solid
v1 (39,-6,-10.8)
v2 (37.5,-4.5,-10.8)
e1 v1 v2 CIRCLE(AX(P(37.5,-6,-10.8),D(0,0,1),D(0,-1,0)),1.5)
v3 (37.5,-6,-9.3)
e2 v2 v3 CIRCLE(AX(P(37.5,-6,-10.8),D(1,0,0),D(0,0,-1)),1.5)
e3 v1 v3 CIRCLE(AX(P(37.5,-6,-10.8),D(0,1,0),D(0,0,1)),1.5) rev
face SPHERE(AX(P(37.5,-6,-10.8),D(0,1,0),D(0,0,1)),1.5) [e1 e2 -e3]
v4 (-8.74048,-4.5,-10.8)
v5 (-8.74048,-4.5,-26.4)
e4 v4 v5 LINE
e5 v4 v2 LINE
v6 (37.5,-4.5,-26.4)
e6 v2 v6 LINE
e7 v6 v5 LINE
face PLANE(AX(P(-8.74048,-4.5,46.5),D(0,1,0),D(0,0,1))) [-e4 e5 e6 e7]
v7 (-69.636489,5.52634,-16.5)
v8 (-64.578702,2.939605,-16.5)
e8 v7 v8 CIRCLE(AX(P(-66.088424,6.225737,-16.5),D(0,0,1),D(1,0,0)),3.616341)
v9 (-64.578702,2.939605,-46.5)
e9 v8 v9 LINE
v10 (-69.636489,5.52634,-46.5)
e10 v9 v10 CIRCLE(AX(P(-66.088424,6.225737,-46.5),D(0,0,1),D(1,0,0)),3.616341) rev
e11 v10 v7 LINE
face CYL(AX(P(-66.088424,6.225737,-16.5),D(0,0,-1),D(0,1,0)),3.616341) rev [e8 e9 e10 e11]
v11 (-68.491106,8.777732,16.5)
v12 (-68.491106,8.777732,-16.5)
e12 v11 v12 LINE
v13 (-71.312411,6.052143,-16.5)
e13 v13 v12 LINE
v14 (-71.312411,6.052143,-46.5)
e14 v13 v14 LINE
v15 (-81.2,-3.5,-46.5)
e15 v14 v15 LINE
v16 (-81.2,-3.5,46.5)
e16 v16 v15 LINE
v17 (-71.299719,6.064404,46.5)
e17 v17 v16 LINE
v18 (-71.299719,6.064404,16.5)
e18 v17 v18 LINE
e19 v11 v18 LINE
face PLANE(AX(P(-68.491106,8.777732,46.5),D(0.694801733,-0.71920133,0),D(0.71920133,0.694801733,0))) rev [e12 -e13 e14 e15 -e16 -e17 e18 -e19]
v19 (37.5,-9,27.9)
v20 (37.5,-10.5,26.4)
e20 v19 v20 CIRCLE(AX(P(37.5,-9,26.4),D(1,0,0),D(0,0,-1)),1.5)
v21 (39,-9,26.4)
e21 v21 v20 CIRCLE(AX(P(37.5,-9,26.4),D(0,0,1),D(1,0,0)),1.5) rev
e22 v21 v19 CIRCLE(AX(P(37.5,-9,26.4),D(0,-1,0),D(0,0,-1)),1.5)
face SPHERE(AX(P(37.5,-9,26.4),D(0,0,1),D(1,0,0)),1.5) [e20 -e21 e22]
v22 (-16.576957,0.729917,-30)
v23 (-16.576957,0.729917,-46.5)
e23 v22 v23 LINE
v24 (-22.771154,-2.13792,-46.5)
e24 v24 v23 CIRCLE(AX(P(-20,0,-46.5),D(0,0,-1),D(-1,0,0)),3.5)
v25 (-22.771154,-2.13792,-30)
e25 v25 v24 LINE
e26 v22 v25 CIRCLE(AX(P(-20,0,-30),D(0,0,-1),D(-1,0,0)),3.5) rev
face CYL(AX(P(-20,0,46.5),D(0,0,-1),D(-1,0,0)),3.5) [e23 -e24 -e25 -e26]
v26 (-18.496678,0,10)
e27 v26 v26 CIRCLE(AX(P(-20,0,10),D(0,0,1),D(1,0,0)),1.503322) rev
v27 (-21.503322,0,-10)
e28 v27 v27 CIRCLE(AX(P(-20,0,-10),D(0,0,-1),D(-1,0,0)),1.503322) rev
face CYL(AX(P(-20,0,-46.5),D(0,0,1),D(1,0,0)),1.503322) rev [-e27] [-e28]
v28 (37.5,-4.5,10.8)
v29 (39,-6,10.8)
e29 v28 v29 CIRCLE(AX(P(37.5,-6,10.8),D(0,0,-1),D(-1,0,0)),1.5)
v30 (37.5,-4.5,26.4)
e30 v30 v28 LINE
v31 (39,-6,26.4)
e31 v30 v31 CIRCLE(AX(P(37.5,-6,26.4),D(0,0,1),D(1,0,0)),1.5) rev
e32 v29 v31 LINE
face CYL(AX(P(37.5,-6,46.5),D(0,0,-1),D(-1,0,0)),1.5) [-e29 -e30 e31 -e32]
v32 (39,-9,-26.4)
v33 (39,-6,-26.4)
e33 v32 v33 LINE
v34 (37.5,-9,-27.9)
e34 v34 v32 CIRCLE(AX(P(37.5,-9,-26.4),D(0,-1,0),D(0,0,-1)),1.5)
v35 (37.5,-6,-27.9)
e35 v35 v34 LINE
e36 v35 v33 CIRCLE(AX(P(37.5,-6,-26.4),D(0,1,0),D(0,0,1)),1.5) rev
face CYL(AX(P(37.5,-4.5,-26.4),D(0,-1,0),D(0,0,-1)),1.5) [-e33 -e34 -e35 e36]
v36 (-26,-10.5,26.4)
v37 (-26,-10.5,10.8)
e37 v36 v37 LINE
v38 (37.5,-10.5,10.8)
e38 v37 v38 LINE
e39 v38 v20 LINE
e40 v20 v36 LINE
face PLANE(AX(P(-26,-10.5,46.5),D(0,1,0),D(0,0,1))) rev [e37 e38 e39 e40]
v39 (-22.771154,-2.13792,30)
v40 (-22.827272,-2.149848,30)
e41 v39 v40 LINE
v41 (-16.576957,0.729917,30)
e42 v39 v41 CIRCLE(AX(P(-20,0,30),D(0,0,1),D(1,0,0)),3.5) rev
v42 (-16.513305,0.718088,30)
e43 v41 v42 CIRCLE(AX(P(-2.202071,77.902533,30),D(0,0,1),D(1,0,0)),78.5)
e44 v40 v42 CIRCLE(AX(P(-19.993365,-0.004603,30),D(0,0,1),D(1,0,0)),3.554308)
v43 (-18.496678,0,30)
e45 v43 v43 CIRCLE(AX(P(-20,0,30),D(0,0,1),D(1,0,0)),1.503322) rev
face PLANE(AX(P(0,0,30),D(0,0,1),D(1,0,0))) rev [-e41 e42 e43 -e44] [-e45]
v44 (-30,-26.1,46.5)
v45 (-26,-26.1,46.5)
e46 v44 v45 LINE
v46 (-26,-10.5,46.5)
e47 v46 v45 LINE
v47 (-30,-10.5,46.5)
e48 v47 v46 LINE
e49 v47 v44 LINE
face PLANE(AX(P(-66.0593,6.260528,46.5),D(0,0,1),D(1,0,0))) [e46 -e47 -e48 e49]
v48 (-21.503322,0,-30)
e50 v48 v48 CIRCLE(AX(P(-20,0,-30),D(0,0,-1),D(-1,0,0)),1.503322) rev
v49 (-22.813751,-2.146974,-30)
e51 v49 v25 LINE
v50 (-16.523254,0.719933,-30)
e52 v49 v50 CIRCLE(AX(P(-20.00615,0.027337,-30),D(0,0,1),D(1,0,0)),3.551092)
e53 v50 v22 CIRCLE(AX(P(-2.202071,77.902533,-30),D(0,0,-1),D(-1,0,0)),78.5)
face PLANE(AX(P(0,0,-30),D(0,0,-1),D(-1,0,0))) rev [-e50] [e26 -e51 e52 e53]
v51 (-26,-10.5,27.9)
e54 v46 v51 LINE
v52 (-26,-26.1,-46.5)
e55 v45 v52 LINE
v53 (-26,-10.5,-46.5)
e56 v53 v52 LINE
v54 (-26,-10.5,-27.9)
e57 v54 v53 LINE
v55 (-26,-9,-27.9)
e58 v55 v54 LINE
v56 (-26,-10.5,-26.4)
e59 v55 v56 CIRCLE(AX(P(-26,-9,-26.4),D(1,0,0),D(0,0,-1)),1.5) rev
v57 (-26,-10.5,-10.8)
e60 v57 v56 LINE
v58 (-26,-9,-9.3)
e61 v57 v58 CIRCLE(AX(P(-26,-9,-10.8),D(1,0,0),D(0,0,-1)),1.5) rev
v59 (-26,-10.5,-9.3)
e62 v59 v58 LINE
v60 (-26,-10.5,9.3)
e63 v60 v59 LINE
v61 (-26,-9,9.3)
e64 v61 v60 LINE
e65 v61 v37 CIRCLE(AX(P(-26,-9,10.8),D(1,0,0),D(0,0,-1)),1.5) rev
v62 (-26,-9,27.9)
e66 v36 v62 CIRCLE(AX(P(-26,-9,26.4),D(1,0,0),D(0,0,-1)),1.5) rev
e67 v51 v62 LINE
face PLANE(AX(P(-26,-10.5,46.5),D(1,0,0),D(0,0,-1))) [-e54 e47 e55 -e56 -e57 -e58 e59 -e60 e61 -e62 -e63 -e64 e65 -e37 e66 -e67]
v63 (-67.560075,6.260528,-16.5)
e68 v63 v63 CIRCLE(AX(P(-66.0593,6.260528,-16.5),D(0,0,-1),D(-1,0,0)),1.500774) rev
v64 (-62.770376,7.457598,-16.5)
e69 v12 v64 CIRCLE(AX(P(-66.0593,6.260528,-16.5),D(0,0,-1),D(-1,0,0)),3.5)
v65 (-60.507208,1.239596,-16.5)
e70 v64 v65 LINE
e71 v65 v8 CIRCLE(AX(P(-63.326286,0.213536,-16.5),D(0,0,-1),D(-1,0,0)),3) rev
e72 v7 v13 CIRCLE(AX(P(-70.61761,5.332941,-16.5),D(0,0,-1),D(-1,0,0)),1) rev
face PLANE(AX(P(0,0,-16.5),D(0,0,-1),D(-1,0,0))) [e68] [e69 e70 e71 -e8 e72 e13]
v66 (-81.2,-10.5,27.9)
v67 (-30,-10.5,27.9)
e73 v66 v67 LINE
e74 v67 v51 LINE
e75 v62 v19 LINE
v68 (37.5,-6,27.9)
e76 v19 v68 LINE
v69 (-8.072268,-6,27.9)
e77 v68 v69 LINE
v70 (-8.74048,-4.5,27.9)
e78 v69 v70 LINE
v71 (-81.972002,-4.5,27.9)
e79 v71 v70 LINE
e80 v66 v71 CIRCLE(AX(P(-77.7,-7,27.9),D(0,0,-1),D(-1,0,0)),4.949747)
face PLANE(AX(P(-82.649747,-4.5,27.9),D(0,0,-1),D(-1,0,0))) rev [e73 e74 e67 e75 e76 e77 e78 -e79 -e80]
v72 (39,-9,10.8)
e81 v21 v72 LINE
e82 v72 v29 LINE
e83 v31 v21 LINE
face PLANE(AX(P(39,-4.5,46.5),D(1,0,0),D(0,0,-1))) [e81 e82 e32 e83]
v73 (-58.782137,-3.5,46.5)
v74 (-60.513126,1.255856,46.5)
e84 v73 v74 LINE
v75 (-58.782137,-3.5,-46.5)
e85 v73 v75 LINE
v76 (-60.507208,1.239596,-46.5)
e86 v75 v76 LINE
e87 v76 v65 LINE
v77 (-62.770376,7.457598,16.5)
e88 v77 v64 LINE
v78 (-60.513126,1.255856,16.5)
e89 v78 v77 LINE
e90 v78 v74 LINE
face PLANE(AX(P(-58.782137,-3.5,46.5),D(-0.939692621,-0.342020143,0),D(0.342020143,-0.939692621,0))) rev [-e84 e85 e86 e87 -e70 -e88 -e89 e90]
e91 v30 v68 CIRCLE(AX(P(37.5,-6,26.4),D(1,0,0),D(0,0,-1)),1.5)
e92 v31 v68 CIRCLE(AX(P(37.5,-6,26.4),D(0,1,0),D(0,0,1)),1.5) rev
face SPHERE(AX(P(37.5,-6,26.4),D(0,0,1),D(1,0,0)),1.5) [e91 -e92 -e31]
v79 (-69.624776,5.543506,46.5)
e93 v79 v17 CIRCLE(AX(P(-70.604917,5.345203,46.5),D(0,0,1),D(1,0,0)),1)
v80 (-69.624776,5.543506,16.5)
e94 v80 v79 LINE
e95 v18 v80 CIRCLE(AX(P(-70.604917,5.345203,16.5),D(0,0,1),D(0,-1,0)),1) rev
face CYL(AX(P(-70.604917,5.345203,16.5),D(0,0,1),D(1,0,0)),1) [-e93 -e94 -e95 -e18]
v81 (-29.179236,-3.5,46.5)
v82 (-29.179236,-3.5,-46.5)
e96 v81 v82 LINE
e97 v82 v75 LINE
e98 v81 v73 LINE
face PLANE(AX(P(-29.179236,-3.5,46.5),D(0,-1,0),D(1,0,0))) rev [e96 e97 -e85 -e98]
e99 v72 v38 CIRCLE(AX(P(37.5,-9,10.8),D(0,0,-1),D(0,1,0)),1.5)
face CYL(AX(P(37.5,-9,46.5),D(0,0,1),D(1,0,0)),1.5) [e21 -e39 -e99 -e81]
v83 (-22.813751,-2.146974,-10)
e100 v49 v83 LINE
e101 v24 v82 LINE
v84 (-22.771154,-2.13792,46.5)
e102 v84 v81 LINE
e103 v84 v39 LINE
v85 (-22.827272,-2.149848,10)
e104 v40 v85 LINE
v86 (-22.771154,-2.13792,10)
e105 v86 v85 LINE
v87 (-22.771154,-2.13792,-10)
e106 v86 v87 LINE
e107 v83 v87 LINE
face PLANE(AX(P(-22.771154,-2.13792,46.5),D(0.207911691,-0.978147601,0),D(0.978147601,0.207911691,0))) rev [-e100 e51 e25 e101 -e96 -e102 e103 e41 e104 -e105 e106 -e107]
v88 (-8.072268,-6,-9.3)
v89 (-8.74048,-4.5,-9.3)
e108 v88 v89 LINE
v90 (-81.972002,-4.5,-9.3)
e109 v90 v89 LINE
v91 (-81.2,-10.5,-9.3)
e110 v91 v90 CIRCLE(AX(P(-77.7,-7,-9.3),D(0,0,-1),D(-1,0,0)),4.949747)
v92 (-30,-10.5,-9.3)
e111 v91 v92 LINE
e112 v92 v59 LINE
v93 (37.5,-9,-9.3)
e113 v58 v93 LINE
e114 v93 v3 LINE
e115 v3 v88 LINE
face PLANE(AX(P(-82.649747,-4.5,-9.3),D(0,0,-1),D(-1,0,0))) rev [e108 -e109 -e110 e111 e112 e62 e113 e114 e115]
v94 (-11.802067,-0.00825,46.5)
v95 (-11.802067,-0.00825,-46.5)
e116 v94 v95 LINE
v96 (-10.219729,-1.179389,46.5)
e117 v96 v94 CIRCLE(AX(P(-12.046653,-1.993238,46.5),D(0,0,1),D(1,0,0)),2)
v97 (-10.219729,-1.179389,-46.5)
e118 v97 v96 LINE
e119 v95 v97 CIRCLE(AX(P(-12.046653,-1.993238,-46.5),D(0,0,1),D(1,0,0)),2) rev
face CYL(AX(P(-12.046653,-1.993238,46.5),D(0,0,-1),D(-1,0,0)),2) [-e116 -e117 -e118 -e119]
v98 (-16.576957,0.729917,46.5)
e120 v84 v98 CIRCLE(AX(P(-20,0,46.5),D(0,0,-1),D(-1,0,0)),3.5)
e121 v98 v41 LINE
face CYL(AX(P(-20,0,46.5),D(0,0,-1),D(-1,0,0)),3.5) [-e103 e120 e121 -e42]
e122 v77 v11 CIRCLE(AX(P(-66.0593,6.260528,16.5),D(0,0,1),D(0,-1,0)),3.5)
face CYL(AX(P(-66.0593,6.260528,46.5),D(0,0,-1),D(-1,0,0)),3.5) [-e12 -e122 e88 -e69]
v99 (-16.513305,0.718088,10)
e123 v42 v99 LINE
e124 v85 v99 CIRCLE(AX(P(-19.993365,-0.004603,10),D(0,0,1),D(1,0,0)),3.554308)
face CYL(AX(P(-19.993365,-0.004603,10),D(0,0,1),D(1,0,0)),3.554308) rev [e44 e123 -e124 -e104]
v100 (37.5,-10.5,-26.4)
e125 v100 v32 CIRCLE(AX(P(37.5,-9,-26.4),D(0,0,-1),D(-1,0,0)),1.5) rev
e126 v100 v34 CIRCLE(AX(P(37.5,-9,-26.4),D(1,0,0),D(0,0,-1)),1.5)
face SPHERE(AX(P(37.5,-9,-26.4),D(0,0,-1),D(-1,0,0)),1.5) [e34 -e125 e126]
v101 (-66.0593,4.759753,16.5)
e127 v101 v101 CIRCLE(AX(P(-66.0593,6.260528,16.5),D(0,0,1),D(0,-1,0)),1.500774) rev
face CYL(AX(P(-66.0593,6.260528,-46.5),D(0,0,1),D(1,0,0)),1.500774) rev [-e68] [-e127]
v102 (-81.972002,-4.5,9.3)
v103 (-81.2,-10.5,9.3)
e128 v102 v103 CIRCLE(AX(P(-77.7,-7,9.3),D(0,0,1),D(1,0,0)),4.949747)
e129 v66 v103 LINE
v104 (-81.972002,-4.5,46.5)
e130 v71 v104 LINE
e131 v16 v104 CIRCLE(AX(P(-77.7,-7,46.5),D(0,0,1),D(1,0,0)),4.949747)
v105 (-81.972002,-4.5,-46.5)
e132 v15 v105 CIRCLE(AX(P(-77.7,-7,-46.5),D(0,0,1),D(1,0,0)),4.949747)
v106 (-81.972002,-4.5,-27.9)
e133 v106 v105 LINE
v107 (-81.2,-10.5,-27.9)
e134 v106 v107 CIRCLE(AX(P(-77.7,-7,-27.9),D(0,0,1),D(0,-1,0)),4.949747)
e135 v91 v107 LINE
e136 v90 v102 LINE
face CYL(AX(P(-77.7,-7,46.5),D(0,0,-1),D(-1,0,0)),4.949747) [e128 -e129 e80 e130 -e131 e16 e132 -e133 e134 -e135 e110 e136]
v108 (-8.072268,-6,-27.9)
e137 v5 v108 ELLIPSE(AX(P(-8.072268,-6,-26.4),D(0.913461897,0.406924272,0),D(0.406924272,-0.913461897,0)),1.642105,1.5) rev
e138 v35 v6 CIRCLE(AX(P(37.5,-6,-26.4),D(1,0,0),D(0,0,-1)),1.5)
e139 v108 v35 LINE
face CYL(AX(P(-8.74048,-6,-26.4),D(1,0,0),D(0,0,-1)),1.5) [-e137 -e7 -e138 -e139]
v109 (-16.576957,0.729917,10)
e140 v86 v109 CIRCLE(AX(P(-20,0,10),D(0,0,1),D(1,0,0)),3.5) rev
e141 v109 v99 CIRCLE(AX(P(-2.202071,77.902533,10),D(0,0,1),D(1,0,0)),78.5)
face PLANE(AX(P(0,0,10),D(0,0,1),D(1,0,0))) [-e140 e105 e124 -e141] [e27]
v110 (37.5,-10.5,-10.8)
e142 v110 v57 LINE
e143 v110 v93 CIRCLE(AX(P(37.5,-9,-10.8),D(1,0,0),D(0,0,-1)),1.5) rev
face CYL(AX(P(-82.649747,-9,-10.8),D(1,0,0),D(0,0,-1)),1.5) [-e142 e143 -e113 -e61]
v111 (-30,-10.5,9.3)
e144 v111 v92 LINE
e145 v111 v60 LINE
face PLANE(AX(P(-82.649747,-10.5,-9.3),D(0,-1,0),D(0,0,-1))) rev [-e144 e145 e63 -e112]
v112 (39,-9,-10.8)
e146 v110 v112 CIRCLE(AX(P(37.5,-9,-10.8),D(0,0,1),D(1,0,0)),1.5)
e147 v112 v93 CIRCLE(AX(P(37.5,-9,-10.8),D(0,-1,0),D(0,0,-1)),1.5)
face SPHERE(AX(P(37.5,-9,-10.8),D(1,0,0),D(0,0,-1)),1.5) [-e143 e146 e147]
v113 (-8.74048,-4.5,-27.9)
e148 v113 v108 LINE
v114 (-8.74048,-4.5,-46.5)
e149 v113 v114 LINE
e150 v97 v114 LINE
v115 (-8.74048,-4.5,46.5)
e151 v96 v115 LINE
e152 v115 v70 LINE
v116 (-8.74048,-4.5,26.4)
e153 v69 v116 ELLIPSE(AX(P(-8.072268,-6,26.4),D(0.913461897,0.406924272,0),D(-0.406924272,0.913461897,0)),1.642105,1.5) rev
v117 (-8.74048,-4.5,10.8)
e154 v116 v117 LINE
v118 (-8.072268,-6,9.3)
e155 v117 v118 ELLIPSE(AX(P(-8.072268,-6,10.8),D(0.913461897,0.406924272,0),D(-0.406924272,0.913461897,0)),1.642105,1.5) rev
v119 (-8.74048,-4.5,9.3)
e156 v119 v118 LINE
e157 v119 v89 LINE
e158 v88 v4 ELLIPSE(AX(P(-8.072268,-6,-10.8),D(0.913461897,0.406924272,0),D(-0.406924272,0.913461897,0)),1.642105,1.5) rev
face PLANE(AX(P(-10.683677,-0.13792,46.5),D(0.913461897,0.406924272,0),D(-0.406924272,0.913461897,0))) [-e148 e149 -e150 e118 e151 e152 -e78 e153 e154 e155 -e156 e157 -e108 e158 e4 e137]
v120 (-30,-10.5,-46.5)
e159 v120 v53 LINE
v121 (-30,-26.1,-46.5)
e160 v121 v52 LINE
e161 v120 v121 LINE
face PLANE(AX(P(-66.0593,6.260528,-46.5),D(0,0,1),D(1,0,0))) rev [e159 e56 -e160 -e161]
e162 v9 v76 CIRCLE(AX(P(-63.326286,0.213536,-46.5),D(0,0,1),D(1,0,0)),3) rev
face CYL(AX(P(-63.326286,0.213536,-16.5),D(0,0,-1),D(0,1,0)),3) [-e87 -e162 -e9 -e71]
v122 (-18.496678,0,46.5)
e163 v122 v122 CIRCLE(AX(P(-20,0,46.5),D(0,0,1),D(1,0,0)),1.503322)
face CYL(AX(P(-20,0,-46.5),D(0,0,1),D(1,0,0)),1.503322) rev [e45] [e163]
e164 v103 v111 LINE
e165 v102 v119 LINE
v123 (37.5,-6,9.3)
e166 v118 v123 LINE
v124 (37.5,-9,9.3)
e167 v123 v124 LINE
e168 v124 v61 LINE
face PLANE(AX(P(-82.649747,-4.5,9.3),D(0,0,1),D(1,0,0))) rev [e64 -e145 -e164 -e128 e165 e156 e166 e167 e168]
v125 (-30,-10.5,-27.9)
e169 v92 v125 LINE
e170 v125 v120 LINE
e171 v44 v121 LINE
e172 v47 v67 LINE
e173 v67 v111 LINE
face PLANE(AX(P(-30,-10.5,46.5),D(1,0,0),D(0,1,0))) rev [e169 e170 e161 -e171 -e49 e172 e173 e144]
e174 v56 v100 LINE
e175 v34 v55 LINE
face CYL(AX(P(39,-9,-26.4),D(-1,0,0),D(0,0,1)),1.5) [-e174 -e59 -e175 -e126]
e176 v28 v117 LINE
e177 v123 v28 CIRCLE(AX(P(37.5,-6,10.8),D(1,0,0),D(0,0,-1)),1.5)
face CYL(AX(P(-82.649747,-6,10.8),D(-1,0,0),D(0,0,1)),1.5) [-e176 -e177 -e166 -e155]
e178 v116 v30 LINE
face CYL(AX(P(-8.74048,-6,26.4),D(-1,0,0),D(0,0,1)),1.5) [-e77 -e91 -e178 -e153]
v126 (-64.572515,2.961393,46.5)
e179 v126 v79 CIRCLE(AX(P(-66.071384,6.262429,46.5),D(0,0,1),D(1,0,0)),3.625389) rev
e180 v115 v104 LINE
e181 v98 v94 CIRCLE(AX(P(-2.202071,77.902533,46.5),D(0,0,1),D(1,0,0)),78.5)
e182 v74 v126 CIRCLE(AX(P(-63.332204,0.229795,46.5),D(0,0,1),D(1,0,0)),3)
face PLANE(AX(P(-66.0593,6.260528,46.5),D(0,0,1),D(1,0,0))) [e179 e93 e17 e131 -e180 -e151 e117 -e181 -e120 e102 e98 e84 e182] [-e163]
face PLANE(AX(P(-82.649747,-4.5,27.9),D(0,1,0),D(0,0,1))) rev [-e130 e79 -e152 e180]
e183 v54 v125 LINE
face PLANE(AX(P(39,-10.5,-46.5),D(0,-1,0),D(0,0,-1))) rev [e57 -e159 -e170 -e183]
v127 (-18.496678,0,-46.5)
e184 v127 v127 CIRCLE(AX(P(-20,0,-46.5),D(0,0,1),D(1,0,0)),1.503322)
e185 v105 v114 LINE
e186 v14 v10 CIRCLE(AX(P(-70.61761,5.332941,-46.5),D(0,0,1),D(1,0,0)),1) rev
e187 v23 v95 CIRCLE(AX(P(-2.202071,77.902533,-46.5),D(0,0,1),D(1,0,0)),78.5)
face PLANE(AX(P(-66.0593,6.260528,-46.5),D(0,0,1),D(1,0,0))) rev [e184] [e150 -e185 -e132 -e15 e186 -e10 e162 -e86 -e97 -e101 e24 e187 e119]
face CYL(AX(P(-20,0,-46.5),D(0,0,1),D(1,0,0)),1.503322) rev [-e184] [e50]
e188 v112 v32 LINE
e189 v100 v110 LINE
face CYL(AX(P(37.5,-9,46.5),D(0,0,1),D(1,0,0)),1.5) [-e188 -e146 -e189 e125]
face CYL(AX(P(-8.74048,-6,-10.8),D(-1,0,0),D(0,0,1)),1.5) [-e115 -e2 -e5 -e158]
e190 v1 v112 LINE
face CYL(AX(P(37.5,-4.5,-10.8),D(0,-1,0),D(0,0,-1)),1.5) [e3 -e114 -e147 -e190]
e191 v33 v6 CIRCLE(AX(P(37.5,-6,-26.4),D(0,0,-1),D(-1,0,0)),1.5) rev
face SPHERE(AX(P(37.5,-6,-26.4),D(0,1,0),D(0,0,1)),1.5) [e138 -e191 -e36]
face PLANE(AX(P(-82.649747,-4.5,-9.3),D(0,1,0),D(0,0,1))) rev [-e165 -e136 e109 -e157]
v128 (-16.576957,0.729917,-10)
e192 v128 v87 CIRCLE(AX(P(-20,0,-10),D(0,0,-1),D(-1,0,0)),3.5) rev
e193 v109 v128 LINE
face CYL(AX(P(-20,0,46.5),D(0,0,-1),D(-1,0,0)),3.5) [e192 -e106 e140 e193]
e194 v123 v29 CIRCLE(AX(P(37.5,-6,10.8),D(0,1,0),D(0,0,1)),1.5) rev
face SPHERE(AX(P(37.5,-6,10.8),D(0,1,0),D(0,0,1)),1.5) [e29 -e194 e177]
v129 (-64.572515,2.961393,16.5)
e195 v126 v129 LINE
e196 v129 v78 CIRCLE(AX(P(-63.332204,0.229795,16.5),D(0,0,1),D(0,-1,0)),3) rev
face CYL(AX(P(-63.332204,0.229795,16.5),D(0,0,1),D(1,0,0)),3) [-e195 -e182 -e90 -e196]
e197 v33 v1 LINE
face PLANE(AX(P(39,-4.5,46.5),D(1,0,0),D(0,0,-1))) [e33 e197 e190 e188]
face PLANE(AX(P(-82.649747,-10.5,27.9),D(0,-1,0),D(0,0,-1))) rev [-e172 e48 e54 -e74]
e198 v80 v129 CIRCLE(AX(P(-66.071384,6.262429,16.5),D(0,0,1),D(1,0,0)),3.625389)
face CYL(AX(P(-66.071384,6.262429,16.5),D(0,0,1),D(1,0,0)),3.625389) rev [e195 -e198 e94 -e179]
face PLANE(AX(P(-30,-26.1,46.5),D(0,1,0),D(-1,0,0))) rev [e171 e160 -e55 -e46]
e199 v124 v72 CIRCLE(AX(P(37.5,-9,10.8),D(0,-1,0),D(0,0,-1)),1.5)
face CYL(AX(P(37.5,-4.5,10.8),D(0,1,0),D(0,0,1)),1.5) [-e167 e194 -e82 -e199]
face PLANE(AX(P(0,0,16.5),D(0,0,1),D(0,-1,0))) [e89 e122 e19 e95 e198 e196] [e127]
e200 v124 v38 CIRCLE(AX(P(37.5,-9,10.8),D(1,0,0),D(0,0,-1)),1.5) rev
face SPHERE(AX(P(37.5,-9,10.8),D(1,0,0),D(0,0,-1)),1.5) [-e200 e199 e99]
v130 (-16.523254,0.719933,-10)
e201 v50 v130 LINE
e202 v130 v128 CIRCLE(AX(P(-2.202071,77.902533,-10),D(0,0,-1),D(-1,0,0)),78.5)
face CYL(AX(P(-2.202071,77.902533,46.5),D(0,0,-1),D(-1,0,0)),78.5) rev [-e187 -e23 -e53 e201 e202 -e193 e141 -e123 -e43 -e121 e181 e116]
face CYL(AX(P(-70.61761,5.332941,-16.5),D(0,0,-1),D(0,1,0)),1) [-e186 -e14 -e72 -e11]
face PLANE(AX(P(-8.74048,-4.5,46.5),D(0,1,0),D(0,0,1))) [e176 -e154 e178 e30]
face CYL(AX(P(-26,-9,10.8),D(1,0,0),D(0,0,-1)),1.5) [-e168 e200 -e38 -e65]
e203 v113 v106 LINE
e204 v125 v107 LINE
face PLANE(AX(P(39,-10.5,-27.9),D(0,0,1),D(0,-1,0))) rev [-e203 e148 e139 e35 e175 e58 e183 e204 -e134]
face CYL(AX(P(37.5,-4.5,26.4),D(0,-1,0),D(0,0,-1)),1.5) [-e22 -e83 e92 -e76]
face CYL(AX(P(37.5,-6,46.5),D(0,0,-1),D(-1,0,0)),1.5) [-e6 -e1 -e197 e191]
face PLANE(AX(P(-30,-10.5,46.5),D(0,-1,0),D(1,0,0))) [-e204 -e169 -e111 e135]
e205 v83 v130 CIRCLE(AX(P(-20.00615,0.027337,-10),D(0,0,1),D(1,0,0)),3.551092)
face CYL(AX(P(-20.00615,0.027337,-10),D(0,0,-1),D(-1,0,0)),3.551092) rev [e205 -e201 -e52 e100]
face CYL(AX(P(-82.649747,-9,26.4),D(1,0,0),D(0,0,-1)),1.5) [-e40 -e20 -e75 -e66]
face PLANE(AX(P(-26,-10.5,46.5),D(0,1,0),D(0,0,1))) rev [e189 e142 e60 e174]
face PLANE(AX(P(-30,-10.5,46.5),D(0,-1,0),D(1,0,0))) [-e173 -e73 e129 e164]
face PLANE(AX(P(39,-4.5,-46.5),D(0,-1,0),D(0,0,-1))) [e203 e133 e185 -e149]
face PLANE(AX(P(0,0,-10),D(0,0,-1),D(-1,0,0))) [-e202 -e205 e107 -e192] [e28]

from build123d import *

# Parameters (mm, degrees)
SALIENTE_EXTRUIR2_DEPTH   = 46.49999999999997
CROQUIS3_R                = 1.5007742960379549
CROQUIS3_R_2              = 1.503322104684281
CORTAR_EXTRUIR1_DEPTH     = 46.49999999999997
CORTAR_EXTRUIR2_START     = 16.5
CORTAR_EXTRUIR2_OUTLINE_R = 1.500774296
CORTAR_EXTRUIR2_DEPTH     = 30
REDONDEO2_R               = 3
CORTAR_EXTRUIR3_START     = -46.5
CORTAR_EXTRUIR3_OUTLINE_R = 1.500774296
CORTAR_EXTRUIR3_DEPTH     = 30
REDONDEO3_R               = 3
CORTAR_EXTRUIR4_START     = 10
CORTAR_EXTRUIR4_OUTLINE_R = 1.503322105
CORTAR_EXTRUIR4_DEPTH     = 20
CORTAR_EXTRUIR5_START     = -30
CORTAR_EXTRUIR5_OUTLINE_R = 1.503322105
CORTAR_EXTRUIR5_DEPTH     = 20
REDONDEO4_R               = 1
CORTAR_EXTRUIR12_DEPTH    = 155.46083657878992
CROQUIS6_W                = 18.599999999999966
CROQUIS6_H                = 6.000000000000004
CORTAR_EXTRUIR13_DEPTH    = 133.823646460648
CROQUIS7_W                = 18.599999999999966
CROQUIS7_H                = 6.000000000000004
CORTAR_EXTRUIR14_DEPTH    = 133.823646460648
REDONDEO5_R               = 1.5
REDONDEO6_R               = 2


# Read off the part's stored shape, not the designer's step: Cortar-Extruir2, Cortar-Extruir3, Cortar-Extruir4, Cortar-Extruir5
with BuildPart() as part:
    # Croquis1 → Saliente-Extruir2 (new, symmetric)
    with BuildSketch(Plane.XY):
        with BuildLine():
            Line((-10.683677010448408, -0.13792021644576552), (-8.74048031278475, -4.500000000012256))
            Line((-8.74048031278475, -4.500000000012256), (39.00000000000001, -4.500000000012256))
            Line((39.00000000000001, -4.500000000012256), (39.00000000000001, -10.500000000012262))
            Line((39.00000000000001, -10.500000000012262), (-25.99999999999999, -10.500000000012262))
            Line((-25.99999999999999, -10.500000000012262), (-25.99999999999999, -26.10000000001226))
            Line((-25.99999999999999, -26.10000000001226), (-29.999999999999986, -26.100000000012262))
            Line((-29.999999999999986, -26.100000000012262), (-29.999999999999993, -10.500000000012264))
            Line((-29.999999999999993, -10.500000000012264), (-81.19999999999999, -10.500000000012271))
            ThreePointArc((-81.19999999999999, -10.500000000012271), (-82.6497474683058, -7.000000000012269), (-81.19999999999999, -3.5000000000122697))
            Line((-81.19999999999999, -3.5000000000122697), (-68.49110633124283, 8.777732226211745))
            ThreePointArc((-68.49110633124283, 8.777732226211745), (-65.27231144406849, 9.67090124633749), (-62.77037609438549, 7.457598074555828))
            Line((-62.77037609438549, 7.457598074555828), (-58.782136556190004, -3.5000000000122684))
            Line((-58.782136556190004, -3.5000000000122684), (-29.179236040573016, -3.500000000012267))
            Line((-29.179236040573016, -3.500000000012267), (-22.77115447929422, -2.1379202164457745))
            ThreePointArc((-22.77115447929422, -2.1379202164457745), (-21.470497358111732, 3.17610414183578), (-16.57695737694327, 0.729917256089285))
            ThreePointArc((-16.57695737694327, 0.729917256089285), (-13.63855195060632, 0.24007822050397465), (-10.683677010448408, -0.13792021644576552))
        make_face()
    extrude(amount=SALIENTE_EXTRUIR2_DEPTH, both=True)

    # Croquis3 → Cortar-Extruir1 (cut, symmetric)
    with BuildSketch(Plane.XY):
        with Locations((-66.05930026713617, 6.260527572915973)):
            Circle(CROQUIS3_R)
        with Locations((-19.999999999999996, 0)):
            Circle(CROQUIS3_R_2)
    extrude(amount=CORTAR_EXTRUIR1_DEPTH, both=True, mode=Mode.SUBTRACT)

    # Cortar-Extruir2 outline → Cortar-Extruir2 (cut)
    with BuildSketch(Plane.XY.offset(CORTAR_EXTRUIR2_START)):
        with BuildLine():
            Line((-68.491106331, 8.777732226), (-69.201699105, 8.091246996))
            ThreePointArc((-69.201699105, 8.091246996), (-66.848168988, 2.721235528), (-62.462991688, 6.61306636))
            Line((-62.462991688, 6.61306636), (-62.770376094, 7.457598075))
            ThreePointArc((-62.770376094, 7.457598075), (-65.272311444, 9.670901246), (-68.491106331, 8.777732226))
        make_face()
        with Locations((-66.059300267, 6.260527573)):
            Circle(CORTAR_EXTRUIR2_OUTLINE_R, mode=Mode.SUBTRACT)
    extrude(amount=CORTAR_EXTRUIR2_DEPTH, mode=Mode.SUBTRACT)

    # Redondeo2
    redondeo2_edges = [part.edges().sort_by_distance(p)[0] for p in [
        (-62.462991687999995, 6.613066360000001, 31.5),
    ]]
    fillet(redondeo2_edges, radius=REDONDEO2_R)

    # Cortar-Extruir3 outline → Cortar-Extruir3 (cut)
    with BuildSketch(Plane.XY.offset(CORTAR_EXTRUIR3_START)):
        with BuildLine():
            ThreePointArc((-69.164573514, 8.127113066), (-66.827048097, 2.685630168), (-62.508602445, 6.738380883))
            Line((-62.508602445, 6.738380883), (-62.770376094, 7.457598075))
            ThreePointArc((-62.770376094, 7.457598075), (-65.272311444, 9.670901246), (-68.491106331, 8.777732226))
            Line((-68.491106331, 8.777732226), (-69.164573514, 8.127113066))
        make_face()
        with Locations((-66.059300267, 6.260527573)):
            Circle(CORTAR_EXTRUIR3_OUTLINE_R, mode=Mode.SUBTRACT)
    extrude(amount=CORTAR_EXTRUIR3_DEPTH, mode=Mode.SUBTRACT)

    # Redondeo3
    redondeo3_edges = [part.edges().sort_by_distance(p)[0] for p in [
        (-62.508602444999994, 6.738380883, -31.5),
    ]]
    fillet(redondeo3_edges, radius=REDONDEO3_R)

    # Cortar-Extruir4 outline → Cortar-Extruir4 (cut)
    with BuildSketch(Plane.XY.offset(CORTAR_EXTRUIR4_START)):
        with BuildLine():
            Line((-22.771154479, -2.137920216), (-22.827271519, -2.149848262))
            ThreePointArc((-22.827271519, -2.149848262), (-18.523452571, -3.240720775), (-16.513304708, 0.718087877))
            ThreePointArc((-16.513304708, 0.718087877), (-16.545132262, 0.723996005), (-16.576957377, 0.729917256))
            ThreePointArc((-16.576957377, 0.729917256), (-21.470497358, 3.176104142), (-22.771154479, -2.137920216))
        make_face()
        with Locations((-20, 0)):
            Circle(CORTAR_EXTRUIR4_OUTLINE_R, mode=Mode.SUBTRACT)
    extrude(amount=CORTAR_EXTRUIR4_DEPTH, mode=Mode.SUBTRACT)

    # Cortar-Extruir5 outline → Cortar-Extruir5 (cut)
    with BuildSketch(Plane.XY.offset(CORTAR_EXTRUIR5_START)):
        with BuildLine():
            ThreePointArc((-22.813751372, -2.146974465), (-18.533466696, -3.203987987), (-16.523253553, 0.719933216))
            ThreePointArc((-16.523253553, 0.719933216), (-16.550106333, 0.724920565), (-16.576957377, 0.729917256))
            ThreePointArc((-16.576957377, 0.729917256), (-21.470497358, 3.176104142), (-22.771154479, -2.137920216))
            Line((-22.771154479, -2.137920216), (-22.813751372, -2.146974465))
        make_face()
        with Locations((-20, 0)):
            Circle(CORTAR_EXTRUIR5_OUTLINE_R, mode=Mode.SUBTRACT)
    extrude(amount=CORTAR_EXTRUIR5_DEPTH, mode=Mode.SUBTRACT)

    # Redondeo4
    redondeo4_edges = [part.edges().sort_by_distance(p)[0] for p in [
        (-69.20169910499999, 8.091246995999999, 31.5),
        (-69.164573514, 8.127113066, -31.5),
    ]]
    fillet(redondeo4_edges, radius=REDONDEO4_R)

    # Croquis3D6 → Cortar-Extruir12 (cut, through all)
    with BuildSketch(Plane(origin=(39.00000000000001, -10.500000000012262, -46.49999999999997), x_dir=(0, 0.30700277992275854, 0.9517086177605509), z_dir=(-1, 0, 0))):
        Polygon((0, 0), (17.701780290346246, -5.710251706563308), (19.543796969882806, 8.7e-16), (1.8420166795365527, 5.71025170656331), align=None)
    extrude(amount=CORTAR_EXTRUIR12_DEPTH, mode=Mode.SUBTRACT)

    # Croquis6 → Cortar-Extruir13 (cut, through all)
    with BuildSketch(Plane(origin=(39.00000000000001, 0, 0), x_dir=(0, 0, -1), z_dir=(1, 0, 0))):
        with Locations((-1.865e-14, -7.50000000001226)):
            Rectangle(CROQUIS6_W, CROQUIS6_H)
    extrude(amount=-CORTAR_EXTRUIR13_DEPTH, mode=Mode.SUBTRACT)

    # Croquis7 → Cortar-Extruir14 (cut, through all)
    with BuildSketch(Plane(origin=(39.00000000000001, 0, 0), x_dir=(0, 0, -1), z_dir=(1, 0, 0))):
        with Locations((-37.19999999999999, -7.50000000001226)):
            Rectangle(CROQUIS7_W, CROQUIS7_H)
    extrude(amount=-CORTAR_EXTRUIR14_DEPTH, mode=Mode.SUBTRACT)

    # Redondeo5
    redondeo5_edges = [part.edges().sort_by_distance(p)[0] for p in [
        (39.00000000000001, -7.500000000012258, -27.899999999999963),
        (15.12975984360763, -4.500000000012255, -27.899999999999963),
        (6.500000000000007, -10.50000000001226, -27.89999999999997),
        (39.00000000000001, -4.500000000012256, -18.599999999999966),
        (39.00000000000001, -10.500000000012262, -18.599999999999966),
        (6.500000000000007, -10.500000000012262, -9.299999999999965),
        (15.12975984360763, -4.500000000012258, -9.299999999999965),
        (6.500000000000007, -10.500000000012262, 9.300000000000002),
        (15.12975984360763, -4.500000000012258, 9.300000000000002),
        (39.00000000000001, -7.50000000001226, -9.299999999999965),
        (39.00000000000001, -7.50000000001226, 9.300000000000002),
        (39.00000000000001, -4.500000000012256, 18.600000000000005),
        (39.00000000000001, -10.500000000012262, 18.600000000000005),
        (15.12975984360763, -4.500000000012258, 27.900000000000006),
        (6.500000000000007, -10.500000000012262, 27.900000000000006),
        (39.00000000000001, -7.50000000001226, 27.900000000000006),
    ]]
    fillet(redondeo5_edges, radius=REDONDEO5_R)

    # Redondeo6
    redondeo6_edges = [part.edges().sort_by_distance(p)[0] for p in [
        (-10.683677010448406, -0.13792021644577176, 0),
    ]]
    fillet(redondeo6_edges, radius=REDONDEO6_R)


solid = part.part
